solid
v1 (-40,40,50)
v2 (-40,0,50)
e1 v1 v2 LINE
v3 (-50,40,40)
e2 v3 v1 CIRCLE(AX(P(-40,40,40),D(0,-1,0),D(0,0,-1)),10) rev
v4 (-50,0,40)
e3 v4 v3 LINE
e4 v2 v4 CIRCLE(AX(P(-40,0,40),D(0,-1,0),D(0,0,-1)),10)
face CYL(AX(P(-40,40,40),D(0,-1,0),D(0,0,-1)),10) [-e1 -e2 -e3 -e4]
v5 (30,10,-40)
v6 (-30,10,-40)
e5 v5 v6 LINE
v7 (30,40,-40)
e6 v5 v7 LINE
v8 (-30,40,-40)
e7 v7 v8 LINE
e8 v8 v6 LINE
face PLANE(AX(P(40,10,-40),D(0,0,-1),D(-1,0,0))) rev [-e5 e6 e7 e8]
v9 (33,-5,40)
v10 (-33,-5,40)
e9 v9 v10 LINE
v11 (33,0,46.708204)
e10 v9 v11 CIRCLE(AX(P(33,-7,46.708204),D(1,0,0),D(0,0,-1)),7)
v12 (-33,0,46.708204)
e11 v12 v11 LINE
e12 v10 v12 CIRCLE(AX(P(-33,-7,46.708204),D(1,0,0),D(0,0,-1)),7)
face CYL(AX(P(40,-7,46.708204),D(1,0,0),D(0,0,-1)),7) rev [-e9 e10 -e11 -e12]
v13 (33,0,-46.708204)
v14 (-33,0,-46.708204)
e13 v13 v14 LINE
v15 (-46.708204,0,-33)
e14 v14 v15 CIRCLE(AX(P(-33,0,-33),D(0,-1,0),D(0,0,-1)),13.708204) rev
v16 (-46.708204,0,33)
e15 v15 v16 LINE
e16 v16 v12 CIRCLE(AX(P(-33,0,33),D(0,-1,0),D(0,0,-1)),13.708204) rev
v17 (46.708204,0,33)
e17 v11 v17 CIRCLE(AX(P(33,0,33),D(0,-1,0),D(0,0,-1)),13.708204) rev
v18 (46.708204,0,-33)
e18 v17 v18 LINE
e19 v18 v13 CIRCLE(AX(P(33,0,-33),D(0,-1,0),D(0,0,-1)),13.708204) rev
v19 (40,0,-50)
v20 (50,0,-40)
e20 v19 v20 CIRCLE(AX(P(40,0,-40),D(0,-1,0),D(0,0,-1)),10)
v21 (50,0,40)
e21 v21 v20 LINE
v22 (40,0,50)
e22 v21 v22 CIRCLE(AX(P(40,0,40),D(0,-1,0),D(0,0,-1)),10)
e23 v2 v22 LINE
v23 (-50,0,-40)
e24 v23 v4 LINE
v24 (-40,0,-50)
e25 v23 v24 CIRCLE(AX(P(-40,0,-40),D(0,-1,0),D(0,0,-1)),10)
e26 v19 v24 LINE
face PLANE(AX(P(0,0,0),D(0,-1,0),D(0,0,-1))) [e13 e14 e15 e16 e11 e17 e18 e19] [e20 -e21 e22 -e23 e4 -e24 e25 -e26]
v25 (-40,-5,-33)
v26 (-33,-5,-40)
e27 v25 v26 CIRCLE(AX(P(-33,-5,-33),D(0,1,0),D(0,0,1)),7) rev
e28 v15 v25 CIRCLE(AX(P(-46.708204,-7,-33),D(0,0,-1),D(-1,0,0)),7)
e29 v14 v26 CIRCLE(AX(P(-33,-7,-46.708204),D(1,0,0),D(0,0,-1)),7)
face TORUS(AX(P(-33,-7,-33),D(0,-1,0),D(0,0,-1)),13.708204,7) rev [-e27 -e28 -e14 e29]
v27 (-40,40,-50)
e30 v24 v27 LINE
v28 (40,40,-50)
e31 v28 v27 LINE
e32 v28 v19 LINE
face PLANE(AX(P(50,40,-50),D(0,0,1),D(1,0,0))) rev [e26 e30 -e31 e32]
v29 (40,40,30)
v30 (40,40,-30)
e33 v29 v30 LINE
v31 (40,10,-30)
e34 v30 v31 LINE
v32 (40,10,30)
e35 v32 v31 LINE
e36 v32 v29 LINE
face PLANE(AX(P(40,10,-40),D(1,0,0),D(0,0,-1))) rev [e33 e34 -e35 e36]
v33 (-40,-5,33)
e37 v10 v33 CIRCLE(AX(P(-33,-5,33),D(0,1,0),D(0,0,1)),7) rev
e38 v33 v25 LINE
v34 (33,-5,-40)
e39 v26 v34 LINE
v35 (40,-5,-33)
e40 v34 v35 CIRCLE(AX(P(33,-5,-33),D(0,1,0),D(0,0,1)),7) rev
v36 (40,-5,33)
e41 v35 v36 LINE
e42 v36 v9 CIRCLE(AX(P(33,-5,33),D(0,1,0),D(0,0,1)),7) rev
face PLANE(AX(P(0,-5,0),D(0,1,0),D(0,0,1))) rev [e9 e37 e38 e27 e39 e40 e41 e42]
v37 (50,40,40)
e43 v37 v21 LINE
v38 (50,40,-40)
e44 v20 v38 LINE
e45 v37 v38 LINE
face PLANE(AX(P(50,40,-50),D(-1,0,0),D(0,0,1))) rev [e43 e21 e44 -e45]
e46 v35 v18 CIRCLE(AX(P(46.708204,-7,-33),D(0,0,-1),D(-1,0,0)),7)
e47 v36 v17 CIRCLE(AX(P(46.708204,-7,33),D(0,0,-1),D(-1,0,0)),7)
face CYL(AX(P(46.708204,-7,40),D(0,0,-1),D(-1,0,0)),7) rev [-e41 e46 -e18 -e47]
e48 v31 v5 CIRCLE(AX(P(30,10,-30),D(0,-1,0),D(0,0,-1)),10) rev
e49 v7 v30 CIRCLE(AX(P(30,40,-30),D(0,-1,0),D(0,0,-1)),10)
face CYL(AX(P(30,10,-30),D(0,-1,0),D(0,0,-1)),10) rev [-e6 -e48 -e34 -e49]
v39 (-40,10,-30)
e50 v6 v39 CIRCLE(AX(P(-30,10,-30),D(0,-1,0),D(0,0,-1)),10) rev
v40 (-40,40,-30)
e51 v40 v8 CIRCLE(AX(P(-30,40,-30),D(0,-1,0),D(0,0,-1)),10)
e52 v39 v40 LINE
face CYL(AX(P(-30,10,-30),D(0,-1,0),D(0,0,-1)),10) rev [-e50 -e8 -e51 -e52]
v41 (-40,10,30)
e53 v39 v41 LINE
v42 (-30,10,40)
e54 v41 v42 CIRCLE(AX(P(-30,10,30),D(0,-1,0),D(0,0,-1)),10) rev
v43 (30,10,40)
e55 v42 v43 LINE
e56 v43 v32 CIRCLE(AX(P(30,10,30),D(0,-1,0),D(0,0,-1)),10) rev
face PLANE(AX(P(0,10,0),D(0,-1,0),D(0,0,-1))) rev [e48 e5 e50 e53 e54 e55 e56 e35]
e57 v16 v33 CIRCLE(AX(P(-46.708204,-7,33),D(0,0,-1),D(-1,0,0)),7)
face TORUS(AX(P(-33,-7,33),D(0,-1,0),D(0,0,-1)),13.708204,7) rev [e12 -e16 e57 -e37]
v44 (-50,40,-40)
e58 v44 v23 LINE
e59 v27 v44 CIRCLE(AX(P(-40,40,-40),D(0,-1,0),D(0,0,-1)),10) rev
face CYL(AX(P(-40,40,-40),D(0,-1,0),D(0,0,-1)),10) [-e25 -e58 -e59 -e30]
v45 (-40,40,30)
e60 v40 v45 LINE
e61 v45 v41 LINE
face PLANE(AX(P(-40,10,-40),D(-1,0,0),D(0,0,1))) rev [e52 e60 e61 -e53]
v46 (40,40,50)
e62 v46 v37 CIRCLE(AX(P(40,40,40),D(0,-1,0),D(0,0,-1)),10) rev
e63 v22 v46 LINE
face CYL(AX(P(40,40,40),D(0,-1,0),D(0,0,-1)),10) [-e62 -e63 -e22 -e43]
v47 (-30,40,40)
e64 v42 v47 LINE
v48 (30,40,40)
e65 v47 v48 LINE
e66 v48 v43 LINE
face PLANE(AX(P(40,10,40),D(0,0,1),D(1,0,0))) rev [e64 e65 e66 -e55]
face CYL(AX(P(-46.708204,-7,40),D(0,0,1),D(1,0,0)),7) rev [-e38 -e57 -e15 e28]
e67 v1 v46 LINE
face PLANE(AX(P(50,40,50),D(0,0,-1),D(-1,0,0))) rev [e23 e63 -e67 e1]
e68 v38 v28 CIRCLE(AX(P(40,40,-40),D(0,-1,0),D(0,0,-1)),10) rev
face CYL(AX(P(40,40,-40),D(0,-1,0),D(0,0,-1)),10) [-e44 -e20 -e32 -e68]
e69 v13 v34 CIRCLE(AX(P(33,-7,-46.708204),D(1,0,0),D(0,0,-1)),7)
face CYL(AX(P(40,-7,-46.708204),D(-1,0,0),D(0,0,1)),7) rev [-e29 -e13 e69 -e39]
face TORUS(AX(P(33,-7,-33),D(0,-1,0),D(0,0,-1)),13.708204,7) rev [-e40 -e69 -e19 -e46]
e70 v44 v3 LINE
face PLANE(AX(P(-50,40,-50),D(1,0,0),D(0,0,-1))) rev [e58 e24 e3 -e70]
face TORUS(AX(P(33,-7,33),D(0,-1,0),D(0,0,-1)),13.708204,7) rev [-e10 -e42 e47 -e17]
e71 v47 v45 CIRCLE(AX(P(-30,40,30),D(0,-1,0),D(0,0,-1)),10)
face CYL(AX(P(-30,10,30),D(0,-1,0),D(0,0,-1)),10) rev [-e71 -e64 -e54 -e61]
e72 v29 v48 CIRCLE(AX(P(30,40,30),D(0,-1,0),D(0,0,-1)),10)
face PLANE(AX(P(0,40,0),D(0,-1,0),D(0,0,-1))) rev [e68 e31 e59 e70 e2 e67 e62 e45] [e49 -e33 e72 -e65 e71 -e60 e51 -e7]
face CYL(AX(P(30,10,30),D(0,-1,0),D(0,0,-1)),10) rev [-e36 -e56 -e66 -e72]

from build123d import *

# Parameters (mm, degrees)
SKETCH1_W           = 100
SKETCH1_H           = 100
BOSS_EXTRUDE1_DEPTH = 40
SKETCH2_W           = 80
SKETCH2_H           = 80
CUT_EXTRUDE1_DEPTH  = 30
SKETCH3_W           = 80
SKETCH3_H           = 80
BOSS_EXTRUDE2_DEPTH = 5
FILLET2_R           = 10
FILLET4_R           = 7
FILLET5_R           = 7


with BuildPart() as part:
    # Sketch1 → Boss-Extrude1 (new body)
    with BuildSketch(Plane(origin=(0, 0, 0), x_dir=(1, 0, 0), z_dir=(0, 1, 0))):
        Rectangle(SKETCH1_W, SKETCH1_H)
    extrude(amount=BOSS_EXTRUDE1_DEPTH)

    # Sketch2 → Cut-Extrude1 (cut)
    with BuildSketch(Plane(origin=(0, 40, 0), x_dir=(1, 0, 0), z_dir=(0, 1, 0))):
        Rectangle(SKETCH2_W, SKETCH2_H)
    extrude(amount=-CUT_EXTRUDE1_DEPTH, mode=Mode.SUBTRACT)

    # Sketch3 → Boss-Extrude2 (add)
    with BuildSketch(Plane.XZ):
        Rectangle(SKETCH3_W, SKETCH3_H)
    extrude(amount=BOSS_EXTRUDE2_DEPTH)

    # Fillet2
    fillet2_edges = [part.edges().sort_by_distance(p)[0] for p in [
        (-40, 25, 40),
        (-40, 25, -40),
        (40, 25, -40),
        (40, 25, 40),
        (-50, 20, -50),
        (50, 20, -50),
        (50, 20, 50),
        (-50, 20, 50),
    ]]
    fillet(fillet2_edges, radius=FILLET2_R)

    # Fillet4
    fillet4_edges = [part.edges().sort_by_distance(p)[0] for p in [
        (-40, -2.5, 40),
        (-40, -2.5, -40),
        (40, -2.5, -40),
        (40, -2.5, 40),
    ]]
    fillet(fillet4_edges, radius=FILLET4_R)

    # Fillet5
    # the kernel refuses this fillet: 7 mm, written as the material it adds along each edge
    with BuildSketch(Plane(origin=(-33, 0, 33), x_dir=(-1, 0, 0), z_dir=(0, 0, -1))) as fillet5_piece_1:
        with BuildLine():
            CenterArc((13.708203932, -7), FILLET5_R, 90, 73.398450401)
            Line((7, -5), (6.865835921, -4.96))
            ThreePointArc((6.865835921, -4.96), (6.86, -2.5), (6.86, 0))
            Line((6.86, 0), (7, 0.14))
            Line((7, 0.14), (13.708203932, 0.14))
            Line((13.708203932, 0.14), (13.708203932, 0))
        make_face()
    revolve(axis=Axis((-33, 0, 33), (0, 1, 0)), revolution_arc=90)
    with BuildSketch(Plane(origin=(33, 0, 40), x_dir=(0, 0, 1), z_dir=(-1, 0, 0)), Plane(origin=(40, 0, -33), x_dir=(1, 0, 0), z_dir=(0, 0, 1)), Plane(origin=(-33, 0, -40), x_dir=(0, 0, -1), z_dir=(1, 0, 0)), Plane(origin=(-40, 0, 33), x_dir=(-1, 0, 0), z_dir=(0, 0, -1))) as fillet5_piece_2:
        with BuildLine():
            CenterArc((6.708203932, -7), FILLET5_R, 90, 73.398450401)
            Line((0, -5), (-0.134164079, -4.96))
            ThreePointArc((-0.134164079, -4.96), (-0.14, -2.5), (-0.14, 0))
            Line((-0.14, 0), (0, 0.14))
            Line((0, 0.14), (6.708203932, 0.14))
            Line((6.708203932, 0.14), (6.708203932, 0))
        make_face()
    extrude(amount=66)
    with BuildSketch(Plane(origin=(33, 0, 33), x_dir=(1, 0, 0), z_dir=(0, 0, -1))) as fillet5_piece_3:
        with BuildLine():
            CenterArc((13.708203932, 7), FILLET5_R, 196.601549599, 73.398450401)
            Line((7, 5), (6.865835921, 4.96))
            ThreePointArc((6.865835921, 4.96), (6.86, 2.5), (6.86, 0))
            Line((6.86, 0), (7, -0.14))
            Line((7, -0.14), (13.708203932, -0.14))
            Line((13.708203932, -0.14), (13.708203932, 0))
        make_face()
    revolve(axis=Axis((33, 0, 33), (0, -1, 0)), revolution_arc=90)
    with BuildSketch(Plane(origin=(33, 0, -33), x_dir=(1, 0, 0), z_dir=(0, 0, 1))) as fillet5_piece_4:
        with BuildLine():
            CenterArc((13.708203932, -7), FILLET5_R, 90, 73.398450401)
            Line((7, -5), (6.865835921, -4.96))
            ThreePointArc((6.865835921, -4.96), (6.86, -2.5), (6.86, 0))
            Line((6.86, 0), (7, 0.14))
            Line((7, 0.14), (13.708203932, 0.14))
            Line((13.708203932, 0.14), (13.708203932, 0))
        make_face()
    revolve(axis=Axis((33, 0, -33), (0, 1, 0)), revolution_arc=90)
    with BuildSketch(Plane(origin=(-33, 0, -33), x_dir=(0, 0, -1), z_dir=(1, 0, 0))) as fillet5_piece_5:
        with BuildLine():
            CenterArc((13.708203932, -7), FILLET5_R, 90, 73.398450401)
            Line((7, -5), (6.865835921, -4.96))
            ThreePointArc((6.865835921, -4.96), (6.86, -2.5), (6.86, 0))
            Line((6.86, 0), (7, 0.14))
            Line((7, 0.14), (13.708203932, 0.14))
            Line((13.708203932, 0.14), (13.708203932, 0))
        make_face()
    revolve(axis=Axis((-33, 0, -33), (0, 1, 0)), revolution_arc=90)


solid = part.part
